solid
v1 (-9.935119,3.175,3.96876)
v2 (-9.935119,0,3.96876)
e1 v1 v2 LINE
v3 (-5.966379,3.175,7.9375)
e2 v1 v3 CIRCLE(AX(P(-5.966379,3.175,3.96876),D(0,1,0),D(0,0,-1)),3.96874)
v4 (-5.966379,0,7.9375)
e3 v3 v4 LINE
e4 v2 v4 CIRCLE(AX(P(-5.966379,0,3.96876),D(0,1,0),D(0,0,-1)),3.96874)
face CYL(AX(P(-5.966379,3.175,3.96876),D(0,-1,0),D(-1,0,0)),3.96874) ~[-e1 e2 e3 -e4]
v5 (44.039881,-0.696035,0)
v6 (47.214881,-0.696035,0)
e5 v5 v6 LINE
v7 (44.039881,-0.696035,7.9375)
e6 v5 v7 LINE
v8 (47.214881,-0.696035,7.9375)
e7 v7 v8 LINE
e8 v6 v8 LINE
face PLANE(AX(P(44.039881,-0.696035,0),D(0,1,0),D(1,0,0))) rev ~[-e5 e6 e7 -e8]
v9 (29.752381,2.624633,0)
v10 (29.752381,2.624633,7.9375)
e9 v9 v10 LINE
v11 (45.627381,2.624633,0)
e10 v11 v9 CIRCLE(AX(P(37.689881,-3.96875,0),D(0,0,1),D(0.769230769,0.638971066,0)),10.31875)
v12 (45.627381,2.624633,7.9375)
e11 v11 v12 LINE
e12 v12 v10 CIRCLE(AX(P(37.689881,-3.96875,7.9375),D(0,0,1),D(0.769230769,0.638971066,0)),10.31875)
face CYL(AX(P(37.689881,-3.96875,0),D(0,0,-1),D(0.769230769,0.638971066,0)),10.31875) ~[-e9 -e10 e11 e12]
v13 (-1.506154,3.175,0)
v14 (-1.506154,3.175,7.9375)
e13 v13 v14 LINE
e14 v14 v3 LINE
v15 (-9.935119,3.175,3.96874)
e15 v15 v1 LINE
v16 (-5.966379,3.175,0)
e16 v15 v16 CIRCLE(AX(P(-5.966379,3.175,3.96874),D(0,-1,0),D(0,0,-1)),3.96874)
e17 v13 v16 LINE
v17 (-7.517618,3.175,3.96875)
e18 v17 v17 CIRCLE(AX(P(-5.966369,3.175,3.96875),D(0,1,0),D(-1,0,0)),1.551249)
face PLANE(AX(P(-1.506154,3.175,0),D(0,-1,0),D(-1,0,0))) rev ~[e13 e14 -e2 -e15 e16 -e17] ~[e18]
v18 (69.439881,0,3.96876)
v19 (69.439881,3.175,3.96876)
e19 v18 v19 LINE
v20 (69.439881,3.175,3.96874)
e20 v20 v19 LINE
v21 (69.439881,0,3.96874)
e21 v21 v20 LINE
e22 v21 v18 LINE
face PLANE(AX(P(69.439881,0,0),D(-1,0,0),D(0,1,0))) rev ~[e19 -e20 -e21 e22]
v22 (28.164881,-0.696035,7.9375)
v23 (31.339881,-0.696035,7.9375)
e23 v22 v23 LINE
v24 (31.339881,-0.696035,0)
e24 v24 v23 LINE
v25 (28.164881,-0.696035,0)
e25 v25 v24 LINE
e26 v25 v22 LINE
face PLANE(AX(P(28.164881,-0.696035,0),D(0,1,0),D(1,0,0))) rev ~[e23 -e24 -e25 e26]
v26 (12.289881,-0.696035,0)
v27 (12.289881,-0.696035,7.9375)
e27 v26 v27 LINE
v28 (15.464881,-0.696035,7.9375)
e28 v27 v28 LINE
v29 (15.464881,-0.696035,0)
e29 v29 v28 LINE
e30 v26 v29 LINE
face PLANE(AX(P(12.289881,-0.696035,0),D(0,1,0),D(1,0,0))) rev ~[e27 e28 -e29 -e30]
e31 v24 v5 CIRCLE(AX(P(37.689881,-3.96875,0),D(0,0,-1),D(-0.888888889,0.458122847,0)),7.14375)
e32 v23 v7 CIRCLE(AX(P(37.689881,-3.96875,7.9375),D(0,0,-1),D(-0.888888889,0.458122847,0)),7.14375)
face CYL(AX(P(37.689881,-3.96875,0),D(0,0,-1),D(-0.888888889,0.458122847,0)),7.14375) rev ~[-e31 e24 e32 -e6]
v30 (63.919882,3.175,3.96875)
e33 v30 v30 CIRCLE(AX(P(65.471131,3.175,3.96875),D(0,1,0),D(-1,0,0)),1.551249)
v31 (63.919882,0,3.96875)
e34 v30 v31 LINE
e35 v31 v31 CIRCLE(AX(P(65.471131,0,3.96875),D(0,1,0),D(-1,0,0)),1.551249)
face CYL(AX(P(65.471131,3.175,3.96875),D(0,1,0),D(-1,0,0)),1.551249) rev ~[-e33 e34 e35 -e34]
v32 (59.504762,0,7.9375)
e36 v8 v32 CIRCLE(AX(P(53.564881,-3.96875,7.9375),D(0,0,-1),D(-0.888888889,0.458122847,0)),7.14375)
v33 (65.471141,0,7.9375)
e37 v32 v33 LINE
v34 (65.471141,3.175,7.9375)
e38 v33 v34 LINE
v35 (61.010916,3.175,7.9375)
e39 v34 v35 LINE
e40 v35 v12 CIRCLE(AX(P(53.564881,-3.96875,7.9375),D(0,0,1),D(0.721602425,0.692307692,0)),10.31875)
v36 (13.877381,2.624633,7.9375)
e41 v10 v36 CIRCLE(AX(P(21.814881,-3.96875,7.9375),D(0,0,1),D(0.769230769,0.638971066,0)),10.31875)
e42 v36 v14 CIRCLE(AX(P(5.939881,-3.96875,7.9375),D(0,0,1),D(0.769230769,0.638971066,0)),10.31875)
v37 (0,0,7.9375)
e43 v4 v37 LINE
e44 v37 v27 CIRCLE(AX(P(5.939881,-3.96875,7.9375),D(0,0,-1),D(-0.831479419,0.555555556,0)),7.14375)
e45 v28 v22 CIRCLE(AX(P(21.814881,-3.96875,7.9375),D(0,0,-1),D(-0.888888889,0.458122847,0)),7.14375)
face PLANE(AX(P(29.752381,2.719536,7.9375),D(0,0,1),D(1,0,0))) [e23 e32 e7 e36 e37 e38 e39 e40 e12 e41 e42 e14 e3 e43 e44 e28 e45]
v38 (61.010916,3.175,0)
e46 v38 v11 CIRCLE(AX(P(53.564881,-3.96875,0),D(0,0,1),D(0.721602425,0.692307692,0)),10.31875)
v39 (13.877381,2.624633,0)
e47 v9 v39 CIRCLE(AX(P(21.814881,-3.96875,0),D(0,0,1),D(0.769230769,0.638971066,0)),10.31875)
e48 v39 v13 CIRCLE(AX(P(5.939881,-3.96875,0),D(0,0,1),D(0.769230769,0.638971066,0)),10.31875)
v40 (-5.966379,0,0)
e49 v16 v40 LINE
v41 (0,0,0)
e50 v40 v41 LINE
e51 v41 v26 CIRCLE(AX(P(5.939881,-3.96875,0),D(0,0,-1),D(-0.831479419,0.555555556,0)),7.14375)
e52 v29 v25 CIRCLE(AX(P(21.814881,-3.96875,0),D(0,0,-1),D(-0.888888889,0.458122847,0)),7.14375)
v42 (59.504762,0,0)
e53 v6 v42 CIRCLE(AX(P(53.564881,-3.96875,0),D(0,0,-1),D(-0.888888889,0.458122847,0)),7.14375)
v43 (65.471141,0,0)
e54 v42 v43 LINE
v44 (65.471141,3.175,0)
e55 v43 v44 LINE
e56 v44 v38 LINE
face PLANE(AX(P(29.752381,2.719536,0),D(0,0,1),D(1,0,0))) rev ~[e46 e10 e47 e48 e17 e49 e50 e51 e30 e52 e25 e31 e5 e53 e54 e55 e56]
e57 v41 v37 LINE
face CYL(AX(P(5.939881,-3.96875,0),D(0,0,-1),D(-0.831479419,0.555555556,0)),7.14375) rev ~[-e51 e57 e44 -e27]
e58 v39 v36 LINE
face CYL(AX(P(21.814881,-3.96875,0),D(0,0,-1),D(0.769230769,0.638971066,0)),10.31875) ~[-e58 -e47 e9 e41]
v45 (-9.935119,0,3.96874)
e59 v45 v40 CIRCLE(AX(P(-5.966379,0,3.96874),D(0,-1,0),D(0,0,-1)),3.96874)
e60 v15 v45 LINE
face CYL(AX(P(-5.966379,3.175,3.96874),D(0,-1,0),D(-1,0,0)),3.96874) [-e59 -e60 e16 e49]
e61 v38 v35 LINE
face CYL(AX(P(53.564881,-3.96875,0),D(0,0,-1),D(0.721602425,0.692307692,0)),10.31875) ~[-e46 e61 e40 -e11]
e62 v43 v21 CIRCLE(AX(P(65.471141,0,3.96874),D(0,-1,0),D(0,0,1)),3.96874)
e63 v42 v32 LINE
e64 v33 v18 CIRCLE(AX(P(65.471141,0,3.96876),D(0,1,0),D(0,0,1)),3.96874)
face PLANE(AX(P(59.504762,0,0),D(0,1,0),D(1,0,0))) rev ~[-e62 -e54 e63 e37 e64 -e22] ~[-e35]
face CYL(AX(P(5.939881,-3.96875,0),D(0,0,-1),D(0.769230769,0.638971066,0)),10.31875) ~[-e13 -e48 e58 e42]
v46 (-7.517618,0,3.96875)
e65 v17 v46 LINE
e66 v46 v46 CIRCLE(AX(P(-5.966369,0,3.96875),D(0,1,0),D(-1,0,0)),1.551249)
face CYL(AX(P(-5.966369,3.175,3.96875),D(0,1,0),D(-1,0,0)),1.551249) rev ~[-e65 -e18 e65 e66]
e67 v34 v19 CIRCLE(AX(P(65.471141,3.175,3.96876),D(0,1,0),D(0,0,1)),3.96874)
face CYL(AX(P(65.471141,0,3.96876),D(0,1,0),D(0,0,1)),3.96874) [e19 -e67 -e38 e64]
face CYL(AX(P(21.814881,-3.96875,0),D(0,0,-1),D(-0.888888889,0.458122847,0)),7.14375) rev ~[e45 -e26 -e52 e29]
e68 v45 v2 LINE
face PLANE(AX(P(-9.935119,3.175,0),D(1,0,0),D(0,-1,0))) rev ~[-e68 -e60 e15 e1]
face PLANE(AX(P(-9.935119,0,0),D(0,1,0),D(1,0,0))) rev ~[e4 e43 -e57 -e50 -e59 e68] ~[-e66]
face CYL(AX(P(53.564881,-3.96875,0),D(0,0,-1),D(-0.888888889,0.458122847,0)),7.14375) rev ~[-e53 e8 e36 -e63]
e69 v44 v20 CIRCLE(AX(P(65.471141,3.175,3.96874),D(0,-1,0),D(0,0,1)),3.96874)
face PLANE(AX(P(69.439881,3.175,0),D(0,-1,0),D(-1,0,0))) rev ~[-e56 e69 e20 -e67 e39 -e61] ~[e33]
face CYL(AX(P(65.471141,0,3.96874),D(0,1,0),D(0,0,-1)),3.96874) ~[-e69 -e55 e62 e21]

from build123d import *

# Parameters (mm, degrees)
F1_DEPTH = 7.9375
F2_R     = 1.5512489022
F3_DEPTH = 3.175
F4_R     = 3.175
F5_DEPTH = 25.4
F6_R     = 3.96874


# Not quite as in the source:
# - a fillet or chamfer is up to 0.001 mm smaller than in the source, because OpenCascade refuses the exact size


with BuildPart() as f1:
    # F0 (on Top) → F1 (new body)
    with BuildSketch(Plane.XY):
        with BuildLine():
            Line((-9.9351188985, 0), (0, 0))
            ThreePointArc((0, 0), (6.3438186296, 3.1635706978), (12.2898811015, -0.6960349097))
            Line((12.2898811015, -0.6960349097), (15.4648811015, -0.6960349097))
            ThreePointArc((15.4648811015, -0.6960349097), (21.8148811015, 3.175), (28.1648811015, -0.6960349097))
            Line((28.1648811015, -0.6960349097), (31.3398811015, -0.6960349097))
            ThreePointArc((31.3398811015, -0.6960349097), (37.6898811015, 3.175), (44.0398811015, -0.6960349097))
            Line((44.0398811015, -0.6960349097), (47.2148811015, -0.6960349097))
            ThreePointArc((47.2148811015, -0.6960349097), (53.1609435734, 3.1635706978), (59.504762203, 0))
            Line((59.504762203, 0), (69.4398811015, 0))
            Line((69.4398811015, 0), (69.4398811015, 3.175))
            Line((69.4398811015, 3.175), (61.0109161202, 3.175))
            ThreePointArc((61.0109161202, 3.175), (53.1959495352, 6.3434025911), (45.6273811015, 2.6246326912))
            ThreePointArc((45.6273811015, 2.6246326912), (37.6898811015, 6.35), (29.7523811015, 2.6246326912))
            ThreePointArc((29.7523811015, 2.6246326912), (21.8148811015, 6.35), (13.8773811015, 2.6246326912))
            ThreePointArc((13.8773811015, 2.6246326912), (6.3088126678, 6.3434025911), (-1.5061539172, 3.175))
            Line((-1.5061539172, 3.175), (-9.9351188985, 3.175))
            Line((-9.9351188985, 3.175), (-9.9351188985, 0))
        make_face()
    extrude(amount=F1_DEPTH)

    # F2 (on face) → F3 (cut, through all)
    with BuildSketch(Plane(origin=(0, 3.175, 0), x_dir=(-1, 0, 0), z_dir=(0, 1, 0))):
        with Locations((5.9663688985, 3.96875)):
            Circle(F2_R)
        with Locations((-65.4711311015, 3.96875)):
            Circle(F2_R)
    extrude(amount=-F3_DEPTH, mode=Mode.SUBTRACT)

    # F4 (on face) → F5 (cut)
    with BuildSketch(Plane(origin=(0, 3.175, 0), x_dir=(-1, 0, 0), z_dir=(0, 1, 0))):
        with Locations((5.9663688985, 3.96875)):
            Circle(F4_R)
        with Locations((-65.4711311015, 3.96875)):
            Circle(F4_R)
    extrude(amount=F5_DEPTH, mode=Mode.SUBTRACT)

    # F6 (radius 3.96875 in the source; OpenCascade refuses exactly that, so slightly less here)
    f6_edges = [f1.edges().sort_by_distance(p)[0] for p in [
        (69.439881, 1.5875, 7.9375),
        (69.439881, 1.5875, 0),
        (-9.935119, 1.5875, 7.9375),
        (-9.935119, 1.5875, 0),
    ]]
    fillet(f6_edges, radius=F6_R)


solid = f1.part
